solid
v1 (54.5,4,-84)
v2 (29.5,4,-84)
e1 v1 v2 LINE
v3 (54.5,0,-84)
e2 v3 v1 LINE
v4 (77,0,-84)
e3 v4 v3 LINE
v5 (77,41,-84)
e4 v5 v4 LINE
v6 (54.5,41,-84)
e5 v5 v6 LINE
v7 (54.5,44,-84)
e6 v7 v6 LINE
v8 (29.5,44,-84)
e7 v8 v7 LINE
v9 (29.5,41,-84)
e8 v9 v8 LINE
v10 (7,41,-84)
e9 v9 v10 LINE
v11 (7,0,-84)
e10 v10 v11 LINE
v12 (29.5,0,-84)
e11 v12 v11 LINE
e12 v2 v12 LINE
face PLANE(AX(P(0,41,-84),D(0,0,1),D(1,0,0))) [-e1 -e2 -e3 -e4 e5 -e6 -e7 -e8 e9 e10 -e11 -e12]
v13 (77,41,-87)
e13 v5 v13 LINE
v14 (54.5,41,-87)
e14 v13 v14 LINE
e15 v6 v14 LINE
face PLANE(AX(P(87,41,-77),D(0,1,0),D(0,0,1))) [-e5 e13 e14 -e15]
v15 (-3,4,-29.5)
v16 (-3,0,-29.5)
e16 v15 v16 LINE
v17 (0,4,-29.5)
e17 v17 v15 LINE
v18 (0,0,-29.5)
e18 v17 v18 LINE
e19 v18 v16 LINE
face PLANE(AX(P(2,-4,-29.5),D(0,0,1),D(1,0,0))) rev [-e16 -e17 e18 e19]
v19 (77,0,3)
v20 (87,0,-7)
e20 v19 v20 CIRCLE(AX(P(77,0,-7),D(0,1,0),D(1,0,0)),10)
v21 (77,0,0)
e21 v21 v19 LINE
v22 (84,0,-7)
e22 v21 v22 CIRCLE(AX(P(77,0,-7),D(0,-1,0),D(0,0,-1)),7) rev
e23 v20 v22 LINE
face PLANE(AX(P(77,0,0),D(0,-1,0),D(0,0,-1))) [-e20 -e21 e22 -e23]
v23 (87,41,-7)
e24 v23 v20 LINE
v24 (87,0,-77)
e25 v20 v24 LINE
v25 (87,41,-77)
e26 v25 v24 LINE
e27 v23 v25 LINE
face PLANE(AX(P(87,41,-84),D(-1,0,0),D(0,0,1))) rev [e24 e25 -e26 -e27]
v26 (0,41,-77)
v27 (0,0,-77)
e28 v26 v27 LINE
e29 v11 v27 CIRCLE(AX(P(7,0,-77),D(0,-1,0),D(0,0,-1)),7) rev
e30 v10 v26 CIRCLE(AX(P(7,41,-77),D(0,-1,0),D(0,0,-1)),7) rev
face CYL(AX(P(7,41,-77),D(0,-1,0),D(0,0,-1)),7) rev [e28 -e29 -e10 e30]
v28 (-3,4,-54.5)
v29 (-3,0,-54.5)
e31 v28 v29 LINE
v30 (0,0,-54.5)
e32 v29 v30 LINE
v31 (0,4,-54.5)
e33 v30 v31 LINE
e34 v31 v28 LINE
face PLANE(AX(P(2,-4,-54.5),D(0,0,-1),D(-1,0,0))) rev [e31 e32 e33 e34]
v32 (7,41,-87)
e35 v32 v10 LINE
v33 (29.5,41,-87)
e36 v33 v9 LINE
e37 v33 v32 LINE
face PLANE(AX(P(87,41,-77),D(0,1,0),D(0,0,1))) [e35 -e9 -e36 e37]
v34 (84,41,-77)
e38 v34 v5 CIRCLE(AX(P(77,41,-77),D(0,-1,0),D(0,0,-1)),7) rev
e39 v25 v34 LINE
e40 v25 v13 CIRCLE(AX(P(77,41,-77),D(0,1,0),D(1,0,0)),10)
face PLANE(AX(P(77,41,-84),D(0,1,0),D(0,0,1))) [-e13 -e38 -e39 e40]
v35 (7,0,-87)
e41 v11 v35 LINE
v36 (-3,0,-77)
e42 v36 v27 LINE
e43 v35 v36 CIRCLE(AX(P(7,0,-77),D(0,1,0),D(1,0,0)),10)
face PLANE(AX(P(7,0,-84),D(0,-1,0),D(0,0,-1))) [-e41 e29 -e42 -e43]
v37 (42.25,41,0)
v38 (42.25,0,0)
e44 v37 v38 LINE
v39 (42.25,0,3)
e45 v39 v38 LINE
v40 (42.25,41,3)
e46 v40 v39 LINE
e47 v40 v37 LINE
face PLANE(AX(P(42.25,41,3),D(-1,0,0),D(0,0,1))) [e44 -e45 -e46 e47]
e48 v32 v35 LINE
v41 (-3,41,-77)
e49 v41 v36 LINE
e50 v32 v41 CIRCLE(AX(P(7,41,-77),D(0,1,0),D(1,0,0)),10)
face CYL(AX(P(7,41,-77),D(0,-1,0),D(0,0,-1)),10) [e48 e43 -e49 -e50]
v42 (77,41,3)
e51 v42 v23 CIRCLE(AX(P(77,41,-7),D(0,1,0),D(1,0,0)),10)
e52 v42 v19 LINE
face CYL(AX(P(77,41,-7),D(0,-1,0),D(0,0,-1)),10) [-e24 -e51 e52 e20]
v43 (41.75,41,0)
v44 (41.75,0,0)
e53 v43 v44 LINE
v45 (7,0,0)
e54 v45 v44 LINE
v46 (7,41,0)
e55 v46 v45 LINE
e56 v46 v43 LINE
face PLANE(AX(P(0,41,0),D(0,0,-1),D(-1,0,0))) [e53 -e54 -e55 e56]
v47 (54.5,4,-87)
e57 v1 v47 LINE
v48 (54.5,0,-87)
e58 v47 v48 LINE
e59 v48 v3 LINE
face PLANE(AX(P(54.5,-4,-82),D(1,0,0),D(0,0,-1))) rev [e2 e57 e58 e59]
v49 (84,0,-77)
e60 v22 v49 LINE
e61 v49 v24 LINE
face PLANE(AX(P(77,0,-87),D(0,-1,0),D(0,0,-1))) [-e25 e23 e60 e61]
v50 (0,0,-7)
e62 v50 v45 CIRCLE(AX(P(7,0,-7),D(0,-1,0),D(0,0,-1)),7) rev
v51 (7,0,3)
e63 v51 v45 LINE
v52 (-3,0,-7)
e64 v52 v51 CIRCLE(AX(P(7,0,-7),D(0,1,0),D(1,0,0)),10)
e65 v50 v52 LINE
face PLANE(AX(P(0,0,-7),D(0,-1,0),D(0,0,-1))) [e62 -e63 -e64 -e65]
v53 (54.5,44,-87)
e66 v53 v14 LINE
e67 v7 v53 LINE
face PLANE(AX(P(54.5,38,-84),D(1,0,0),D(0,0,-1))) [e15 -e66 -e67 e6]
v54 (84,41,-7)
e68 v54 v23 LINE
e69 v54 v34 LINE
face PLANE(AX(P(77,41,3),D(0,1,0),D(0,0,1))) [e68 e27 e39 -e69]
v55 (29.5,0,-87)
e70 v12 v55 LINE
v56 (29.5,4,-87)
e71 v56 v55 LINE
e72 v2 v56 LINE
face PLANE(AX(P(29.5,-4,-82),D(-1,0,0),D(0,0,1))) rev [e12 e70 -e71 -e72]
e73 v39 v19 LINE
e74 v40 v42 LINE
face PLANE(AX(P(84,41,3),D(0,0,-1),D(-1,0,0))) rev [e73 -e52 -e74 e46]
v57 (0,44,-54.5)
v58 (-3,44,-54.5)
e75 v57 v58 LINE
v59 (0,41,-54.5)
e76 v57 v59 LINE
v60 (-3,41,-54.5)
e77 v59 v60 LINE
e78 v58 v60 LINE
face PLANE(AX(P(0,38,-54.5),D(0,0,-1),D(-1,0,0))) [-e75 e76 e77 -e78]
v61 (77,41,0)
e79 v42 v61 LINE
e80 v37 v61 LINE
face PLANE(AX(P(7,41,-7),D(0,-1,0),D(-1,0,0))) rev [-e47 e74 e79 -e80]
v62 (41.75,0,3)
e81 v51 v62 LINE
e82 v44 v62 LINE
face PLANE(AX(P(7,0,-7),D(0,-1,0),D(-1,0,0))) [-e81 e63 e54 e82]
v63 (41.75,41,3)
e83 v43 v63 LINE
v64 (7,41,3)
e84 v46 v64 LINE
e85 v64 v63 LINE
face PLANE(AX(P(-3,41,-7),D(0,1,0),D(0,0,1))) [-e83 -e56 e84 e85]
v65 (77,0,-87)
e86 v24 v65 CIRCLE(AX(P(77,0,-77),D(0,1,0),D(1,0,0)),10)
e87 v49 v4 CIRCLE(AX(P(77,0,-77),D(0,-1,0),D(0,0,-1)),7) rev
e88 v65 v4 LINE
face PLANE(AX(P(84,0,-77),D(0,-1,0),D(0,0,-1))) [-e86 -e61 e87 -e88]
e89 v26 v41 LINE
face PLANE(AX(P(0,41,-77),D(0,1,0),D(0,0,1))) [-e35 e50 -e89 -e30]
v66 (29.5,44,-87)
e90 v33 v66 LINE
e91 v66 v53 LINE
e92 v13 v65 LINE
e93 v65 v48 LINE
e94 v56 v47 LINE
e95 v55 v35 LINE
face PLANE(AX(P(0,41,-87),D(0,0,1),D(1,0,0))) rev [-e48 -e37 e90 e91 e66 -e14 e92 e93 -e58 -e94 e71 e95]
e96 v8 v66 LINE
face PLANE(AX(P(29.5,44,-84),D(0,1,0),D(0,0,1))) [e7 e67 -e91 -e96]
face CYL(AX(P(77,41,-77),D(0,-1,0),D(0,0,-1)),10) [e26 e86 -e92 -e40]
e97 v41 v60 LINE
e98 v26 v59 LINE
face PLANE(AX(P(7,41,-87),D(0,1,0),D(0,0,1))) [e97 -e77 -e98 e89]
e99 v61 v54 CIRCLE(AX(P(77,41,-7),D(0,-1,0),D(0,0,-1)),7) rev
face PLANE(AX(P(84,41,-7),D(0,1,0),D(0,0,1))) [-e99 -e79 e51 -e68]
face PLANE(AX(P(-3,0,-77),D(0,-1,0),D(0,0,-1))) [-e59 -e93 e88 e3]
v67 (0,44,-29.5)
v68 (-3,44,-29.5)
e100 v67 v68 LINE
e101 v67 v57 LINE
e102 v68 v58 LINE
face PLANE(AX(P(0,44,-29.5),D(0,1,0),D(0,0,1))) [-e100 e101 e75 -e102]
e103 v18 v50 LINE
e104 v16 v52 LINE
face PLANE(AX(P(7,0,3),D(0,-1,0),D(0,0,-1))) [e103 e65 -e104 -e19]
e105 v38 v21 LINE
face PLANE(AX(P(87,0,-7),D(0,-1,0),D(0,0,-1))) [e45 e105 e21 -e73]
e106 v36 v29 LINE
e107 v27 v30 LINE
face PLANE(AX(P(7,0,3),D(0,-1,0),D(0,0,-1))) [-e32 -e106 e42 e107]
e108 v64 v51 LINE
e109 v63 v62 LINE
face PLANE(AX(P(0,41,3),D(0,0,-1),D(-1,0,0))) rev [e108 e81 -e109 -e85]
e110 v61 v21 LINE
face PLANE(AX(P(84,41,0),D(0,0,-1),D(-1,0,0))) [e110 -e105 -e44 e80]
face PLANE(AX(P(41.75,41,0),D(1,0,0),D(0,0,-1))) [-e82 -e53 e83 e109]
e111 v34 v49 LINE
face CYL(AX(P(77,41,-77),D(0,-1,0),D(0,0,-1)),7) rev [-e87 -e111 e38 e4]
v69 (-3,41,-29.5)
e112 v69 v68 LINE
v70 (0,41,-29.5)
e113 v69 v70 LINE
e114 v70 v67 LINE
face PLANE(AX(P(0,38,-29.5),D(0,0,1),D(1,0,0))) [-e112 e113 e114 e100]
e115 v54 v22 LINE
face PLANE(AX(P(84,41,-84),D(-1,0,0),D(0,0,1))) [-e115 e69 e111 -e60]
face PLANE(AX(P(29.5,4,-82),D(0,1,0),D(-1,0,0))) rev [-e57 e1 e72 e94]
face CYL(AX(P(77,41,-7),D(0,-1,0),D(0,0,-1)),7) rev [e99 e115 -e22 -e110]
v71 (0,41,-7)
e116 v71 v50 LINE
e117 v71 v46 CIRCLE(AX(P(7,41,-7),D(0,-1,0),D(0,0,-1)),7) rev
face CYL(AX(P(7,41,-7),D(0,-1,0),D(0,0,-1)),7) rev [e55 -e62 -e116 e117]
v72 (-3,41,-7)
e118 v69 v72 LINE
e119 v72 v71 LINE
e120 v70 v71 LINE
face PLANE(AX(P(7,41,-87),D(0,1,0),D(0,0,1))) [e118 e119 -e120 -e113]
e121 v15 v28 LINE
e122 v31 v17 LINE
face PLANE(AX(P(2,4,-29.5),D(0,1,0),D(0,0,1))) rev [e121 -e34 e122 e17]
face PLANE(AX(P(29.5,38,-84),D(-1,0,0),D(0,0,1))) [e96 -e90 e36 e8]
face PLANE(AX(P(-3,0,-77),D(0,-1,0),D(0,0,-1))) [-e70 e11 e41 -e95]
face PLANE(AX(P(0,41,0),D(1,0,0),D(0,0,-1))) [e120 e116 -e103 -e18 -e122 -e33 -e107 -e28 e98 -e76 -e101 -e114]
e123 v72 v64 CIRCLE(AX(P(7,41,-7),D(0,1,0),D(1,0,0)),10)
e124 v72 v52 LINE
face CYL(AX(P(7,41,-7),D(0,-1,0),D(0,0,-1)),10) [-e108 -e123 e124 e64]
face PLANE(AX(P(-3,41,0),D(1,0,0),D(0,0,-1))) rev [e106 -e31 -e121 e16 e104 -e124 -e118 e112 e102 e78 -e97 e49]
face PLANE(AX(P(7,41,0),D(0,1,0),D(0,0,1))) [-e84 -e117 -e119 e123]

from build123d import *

# Parameters (mm, degrees)
BASE_FLANGE1_DEPTH  = 41
SKETCH8_W           = 25
SKETCH8_H           = 8
CUT_EXTRUDE1_DEPTH  = 5
SKETCH9_W           = 25
SKETCH9_H           = 8
CUT_EXTRUDE2_DEPTH  = 5
SKETCH10_W          = 25
SKETCH10_H          = 6
BOSS_EXTRUDE1_DEPTH = 3
SKETCH11_W          = 25
SKETCH11_H          = 6
BOSS_EXTRUDE2_DEPTH = 3


# Read off the part's stored shape, not the designer's step: Base-Flange1
with BuildPart() as part:
    # Base-Flange1 outline → Base-Flange1 (new body)
    with BuildSketch(Plane(origin=(0, 0, 0), x_dir=(1, 0, 0), z_dir=(0, 1, 0))):
        with BuildLine():
            Line((7, -3), (41.75, -3))
            Line((41.75, -3), (41.75, 0))
            Line((41.75, 0), (7, 0))
            ThreePointArc((7, 0), (2.050252532, 2.050252532), (0, 7))
            Line((0, 7), (0, 77))
            ThreePointArc((0, 77), (2.050252532, 81.949747468), (7, 84))
            Line((7, 84), (77, 84))
            ThreePointArc((77, 84), (81.949747468, 81.949747468), (84, 77))
            Line((84, 77), (84, 7))
            ThreePointArc((84, 7), (81.949747468, 2.050252532), (77, 0))
            Line((77, 0), (42.25, 0))
            Line((42.25, 0), (42.25, -3))
            Line((42.25, -3), (77, -3))
            ThreePointArc((77, -3), (84.071067812, -0.071067812), (87, 7))
            Line((87, 7), (87, 77))
            ThreePointArc((87, 77), (84.071067812, 84.071067812), (77, 87))
            Line((77, 87), (7, 87))
            ThreePointArc((7, 87), (-0.071067812, 84.071067812), (-3, 77))
            Line((-3, 77), (-3, 7))
            ThreePointArc((-3, 7), (-0.071067812, -0.071067812), (7, -3))
        make_face()
    extrude(amount=BASE_FLANGE1_DEPTH)

    # Sketch8 → Cut-Extrude1 (cut)
    with BuildSketch(Plane(origin=(0, 0, -87), x_dir=(-1, 0, 0), z_dir=(0, 0, -1))):
        with Locations((-42, 0)):
            Rectangle(SKETCH8_W, SKETCH8_H)
    extrude(amount=-CUT_EXTRUDE1_DEPTH, mode=Mode.SUBTRACT)

    # Sketch9 → Cut-Extrude2 (cut)
    with BuildSketch(Plane.ZY.offset(3)):
        with Locations((-42, 0)):
            Rectangle(SKETCH9_W, SKETCH9_H)
    extrude(amount=-CUT_EXTRUDE2_DEPTH, mode=Mode.SUBTRACT)

    # Sketch10 → Boss-Extrude1 (add)
    with BuildSketch(Plane(origin=(0, 0, -87), x_dir=(-1, 0, 0), z_dir=(0, 0, -1))):
        with Locations((-42, 41)):
            Rectangle(SKETCH10_W, SKETCH10_H)
    extrude(amount=-BOSS_EXTRUDE1_DEPTH)

    # Sketch11 → Boss-Extrude2 (add)
    with BuildSketch(Plane.ZY.offset(3)):
        with Locations((-42, 41)):
            Rectangle(SKETCH11_W, SKETCH11_H)
    extrude(amount=-BOSS_EXTRUDE2_DEPTH)


solid = part.part
